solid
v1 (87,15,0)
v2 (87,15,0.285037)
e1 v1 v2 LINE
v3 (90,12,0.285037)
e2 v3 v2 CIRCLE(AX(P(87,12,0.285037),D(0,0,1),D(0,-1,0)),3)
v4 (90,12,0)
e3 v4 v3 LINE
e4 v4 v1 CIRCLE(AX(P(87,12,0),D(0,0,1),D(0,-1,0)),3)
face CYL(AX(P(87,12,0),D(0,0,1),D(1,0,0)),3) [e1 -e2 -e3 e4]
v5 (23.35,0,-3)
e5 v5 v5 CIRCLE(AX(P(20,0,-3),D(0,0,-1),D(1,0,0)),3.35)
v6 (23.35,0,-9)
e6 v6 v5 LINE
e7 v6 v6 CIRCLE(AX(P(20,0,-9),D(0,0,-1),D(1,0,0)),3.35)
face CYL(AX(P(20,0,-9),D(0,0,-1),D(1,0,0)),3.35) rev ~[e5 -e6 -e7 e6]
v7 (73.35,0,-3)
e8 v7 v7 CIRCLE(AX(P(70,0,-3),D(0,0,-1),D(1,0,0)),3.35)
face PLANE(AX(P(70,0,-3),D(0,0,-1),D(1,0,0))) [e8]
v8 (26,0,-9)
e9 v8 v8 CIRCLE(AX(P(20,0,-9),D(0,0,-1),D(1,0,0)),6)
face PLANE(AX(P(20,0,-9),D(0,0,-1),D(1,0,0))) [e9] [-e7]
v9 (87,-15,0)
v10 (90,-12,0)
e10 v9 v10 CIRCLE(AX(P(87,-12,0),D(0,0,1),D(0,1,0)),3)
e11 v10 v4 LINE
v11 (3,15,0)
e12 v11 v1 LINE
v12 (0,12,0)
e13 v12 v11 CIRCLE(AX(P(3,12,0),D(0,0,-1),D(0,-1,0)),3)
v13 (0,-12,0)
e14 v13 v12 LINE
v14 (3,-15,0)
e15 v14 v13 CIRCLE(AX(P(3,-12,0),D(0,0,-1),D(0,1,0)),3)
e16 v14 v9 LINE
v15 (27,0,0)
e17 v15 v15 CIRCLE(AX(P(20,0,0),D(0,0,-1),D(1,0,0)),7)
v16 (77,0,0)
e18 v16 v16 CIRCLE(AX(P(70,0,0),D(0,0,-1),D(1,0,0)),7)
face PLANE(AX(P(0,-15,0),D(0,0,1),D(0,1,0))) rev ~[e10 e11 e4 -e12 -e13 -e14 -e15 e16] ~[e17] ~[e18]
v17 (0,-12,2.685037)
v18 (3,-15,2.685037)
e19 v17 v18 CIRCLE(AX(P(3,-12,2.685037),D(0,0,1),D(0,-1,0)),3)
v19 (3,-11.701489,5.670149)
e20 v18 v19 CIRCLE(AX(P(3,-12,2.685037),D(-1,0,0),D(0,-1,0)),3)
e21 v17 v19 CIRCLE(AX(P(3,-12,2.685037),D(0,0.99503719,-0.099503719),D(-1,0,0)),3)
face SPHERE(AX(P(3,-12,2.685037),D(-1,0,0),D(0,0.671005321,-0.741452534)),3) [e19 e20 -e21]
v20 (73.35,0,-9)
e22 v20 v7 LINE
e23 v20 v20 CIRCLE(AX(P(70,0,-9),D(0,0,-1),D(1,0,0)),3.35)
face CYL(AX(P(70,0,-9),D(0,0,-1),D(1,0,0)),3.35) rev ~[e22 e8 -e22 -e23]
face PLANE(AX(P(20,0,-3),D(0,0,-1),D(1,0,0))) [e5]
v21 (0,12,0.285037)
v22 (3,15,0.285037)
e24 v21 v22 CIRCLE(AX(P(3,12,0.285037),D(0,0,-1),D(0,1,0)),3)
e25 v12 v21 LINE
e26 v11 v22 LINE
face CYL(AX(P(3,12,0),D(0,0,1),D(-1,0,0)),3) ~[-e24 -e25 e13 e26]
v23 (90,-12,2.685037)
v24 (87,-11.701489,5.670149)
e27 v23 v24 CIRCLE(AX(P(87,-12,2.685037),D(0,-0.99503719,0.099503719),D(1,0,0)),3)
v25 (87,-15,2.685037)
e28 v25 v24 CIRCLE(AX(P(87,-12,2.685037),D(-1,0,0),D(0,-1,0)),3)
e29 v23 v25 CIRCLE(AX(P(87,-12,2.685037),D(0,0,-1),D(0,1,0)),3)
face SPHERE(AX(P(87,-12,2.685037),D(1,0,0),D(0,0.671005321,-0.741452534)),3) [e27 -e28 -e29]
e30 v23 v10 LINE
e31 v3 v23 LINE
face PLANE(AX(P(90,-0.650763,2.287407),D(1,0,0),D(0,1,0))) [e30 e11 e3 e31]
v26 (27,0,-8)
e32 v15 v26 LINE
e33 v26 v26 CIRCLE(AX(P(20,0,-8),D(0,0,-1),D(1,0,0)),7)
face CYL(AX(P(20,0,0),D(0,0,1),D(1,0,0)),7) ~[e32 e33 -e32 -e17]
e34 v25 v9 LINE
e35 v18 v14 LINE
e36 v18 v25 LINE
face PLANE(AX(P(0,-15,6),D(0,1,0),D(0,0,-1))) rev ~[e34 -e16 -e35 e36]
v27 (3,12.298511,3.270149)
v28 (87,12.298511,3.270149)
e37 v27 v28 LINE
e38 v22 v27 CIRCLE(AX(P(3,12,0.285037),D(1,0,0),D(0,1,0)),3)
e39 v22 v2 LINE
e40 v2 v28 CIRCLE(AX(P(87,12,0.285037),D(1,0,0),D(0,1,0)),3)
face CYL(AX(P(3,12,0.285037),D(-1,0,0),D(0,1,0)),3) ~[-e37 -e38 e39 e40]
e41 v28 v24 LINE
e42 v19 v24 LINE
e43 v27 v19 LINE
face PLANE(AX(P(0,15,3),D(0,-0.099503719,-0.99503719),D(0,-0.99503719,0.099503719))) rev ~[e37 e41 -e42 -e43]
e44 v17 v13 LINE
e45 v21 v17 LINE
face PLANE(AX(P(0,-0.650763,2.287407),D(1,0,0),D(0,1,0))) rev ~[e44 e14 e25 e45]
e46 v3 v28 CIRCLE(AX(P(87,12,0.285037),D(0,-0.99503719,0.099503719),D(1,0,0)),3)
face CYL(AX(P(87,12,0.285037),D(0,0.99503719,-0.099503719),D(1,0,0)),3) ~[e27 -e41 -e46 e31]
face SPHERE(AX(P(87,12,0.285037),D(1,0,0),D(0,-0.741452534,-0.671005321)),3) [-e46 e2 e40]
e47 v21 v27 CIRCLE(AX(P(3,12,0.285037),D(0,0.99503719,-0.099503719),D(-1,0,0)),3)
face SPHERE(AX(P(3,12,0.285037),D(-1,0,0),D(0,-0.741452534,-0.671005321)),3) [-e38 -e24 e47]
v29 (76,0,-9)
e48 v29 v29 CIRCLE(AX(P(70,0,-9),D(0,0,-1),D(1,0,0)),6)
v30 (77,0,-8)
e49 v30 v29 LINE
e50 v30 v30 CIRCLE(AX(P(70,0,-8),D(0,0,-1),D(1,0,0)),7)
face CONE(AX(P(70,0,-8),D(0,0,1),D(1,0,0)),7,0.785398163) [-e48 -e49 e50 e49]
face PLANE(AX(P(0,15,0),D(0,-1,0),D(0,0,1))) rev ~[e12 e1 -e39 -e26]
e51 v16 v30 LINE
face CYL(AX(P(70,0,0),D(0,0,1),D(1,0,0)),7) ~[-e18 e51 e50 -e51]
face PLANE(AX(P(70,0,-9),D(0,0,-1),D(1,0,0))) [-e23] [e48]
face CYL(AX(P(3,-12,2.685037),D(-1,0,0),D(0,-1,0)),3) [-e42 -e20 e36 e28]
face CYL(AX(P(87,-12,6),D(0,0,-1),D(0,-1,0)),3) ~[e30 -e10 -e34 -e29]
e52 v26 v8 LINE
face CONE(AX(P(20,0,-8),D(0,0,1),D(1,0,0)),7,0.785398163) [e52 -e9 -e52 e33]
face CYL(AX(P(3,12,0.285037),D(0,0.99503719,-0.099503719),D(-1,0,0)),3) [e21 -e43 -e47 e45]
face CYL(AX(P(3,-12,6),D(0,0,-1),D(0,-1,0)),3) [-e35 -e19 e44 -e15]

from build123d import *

# Parameters (mm, degrees)
F1_DEPTH     = 90
F3_R         = 7
F4_DEPTH     = 9
F5_R         = 3.35
F6_DEPTH     = 6
F7_SIZE      = 1
F8_R         = 3
F9_T1_DEPTH  = 84
F9_T3_DEPTH  = 24.1197014907
F9_T8_DEPTH  = 3
F9_T14_DEPTH = 3
F9_T20_DEPTH = 3
F9_T26_DEPTH = 3


# Not quite as in the source:
# - a fillet or chamfer that OpenCascade refuses, or shapes differently, is made with other operations: its cross-section is extruded or revolved along the edge and cut away or added


with BuildPart() as f1:
    # F0 (on Right) → F1 (new body)
    with BuildSketch(Plane.YZ):
        Polygon((-15, 6), (-15, 0), (15, 0), (15, 3), align=None)
    extrude(amount=F1_DEPTH)

    # F3 (on face) → F4 (join)
    with BuildSketch(Plane(origin=(0, 0, 0), x_dir=(1, 0, 0), z_dir=(0, 0, -1))):
        with Locations((70, 0)):
            Circle(F3_R)
        with Locations((20, 0)):
            Circle(F3_R)
    extrude(amount=F4_DEPTH)

    # F5 (on face) → F6 (cut)
    with BuildSketch(Plane(origin=(0, 0, -9), x_dir=(1, 0, 0), z_dir=(0, 0, -1))):
        with Locations((70, 0)):
            Circle(F5_R)
        with Locations((20, 0)):
            Circle(F5_R)
    extrude(amount=-F6_DEPTH, mode=Mode.SUBTRACT)

    # F7
    f7_edges = [f1.edges().sort_by_distance(p)[0] for p in [
        (63, 0, -9),
        (13, 0, -9),
    ]]
    chamfer(f7_edges, length=F7_SIZE)

    # F8
    f8_edges = [f1.edges().sort_by_distance(p)[0] for p in [
        (90, 15, 1.5),
        (0, 15, 1.5),
        (0, -15, 3),
        (90, -15, 3),
    ]]
    fillet(f8_edges, radius=F8_R)

    # F9: fillet of radius 3 on 4 edges, made by hand

    # F9_s2 → F9_t1 (cut)
    with BuildSketch(Plane.YZ.offset(3)):
        with BuildLine():
            ThreePointArc((15, 0.2850373137), (14.2243576007, 2.2980532759), (12.2985111571, 3.2701488843))
            Line((12.2985111571, 3.2701488843), (15, 3))
            Line((15, 3), (15, 0.2850373137))
        make_face()
        with BuildLine():
            ThreePointArc((-15, 2.6850373137), (-14.0130159623, 4.9093949143), (-11.7014888429, 5.6701488843))
            Line((-11.7014888429, 5.6701488843), (-15, 6))
            Line((-15, 6), (-15, 2.6850373137))
        make_face()
    extrude(amount=F9_T1_DEPTH, mode=Mode.SUBTRACT)

    # F9_s4 → F9_t3 (cut)
    with BuildSketch(Plane(origin=(0, 11.8529666026, -1.1852966603), x_dir=(1, 0, 0), z_dir=(0, -0.9950371902, 0.099503719))):
        with BuildLine():
            ThreePointArc((0, 1.4776673559), (0.8786796564, 3.5989876995), (3, 4.4776673559))
            Line((3, 4.4776673559), (0, 4.4776673559))
            Line((0, 4.4776673559), (0, 1.4776673559))
        make_face()
        with BuildLine():
            ThreePointArc((90, 1.4776673559), (89.1213203436, 3.5989876995), (87, 4.4776673559))
            Line((87, 4.4776673559), (90, 4.4776673559))
            Line((90, 4.4776673559), (90, 1.4776673559))
        make_face()
    extrude(amount=F9_T3_DEPTH, mode=Mode.SUBTRACT)


with BuildPart() as f9_tool6:
    # F9_s7 → F9_t8 (new body)
    with BuildSketch(Plane.YZ.offset(87)):
        Polygon((12, 0.2850373137), (15, 0.2850373137), (15, 3), (12.2985111571, 3.2701488843), align=None)
    extrude(amount=F9_T8_DEPTH)

    # F9_s9 → F9_t10 (revolve, cut)
    with BuildSketch(Plane(origin=(87, 12, 0.2850373137), x_dir=(0, -0.7414525336, -0.6710053208), z_dir=(0, -0.6710053208, 0.7414525336))):
        with BuildLine():
            ThreePointArc((0, -3), (3, 0), (0, 3))
            Line((0, 3), (0, -3))
        make_face()
    revolve(axis=Axis((87, 12, 0.2850373137), (1, 0, 0)), mode=Mode.SUBTRACT)


with BuildPart() as f1_1:
    add(f1.part)

    # F9_t5: cut F9_tool6
    add(f9_tool6.part, mode=Mode.SUBTRACT)


with BuildPart() as f9_tool12:
    # F9_s13 → F9_t14 (new body)
    with BuildSketch(Plane.YZ.offset(87)):
        Polygon((-12, 2.6850373137), (-15, 2.6850373137), (-15, 6), (-11.7014888429, 5.6701488843), align=None)
    extrude(amount=F9_T14_DEPTH)

    # F9_s15 → F9_t16 (revolve, cut)
    with BuildSketch(Plane(origin=(87, -12, 2.6850373137), x_dir=(0, 0.6710053208, -0.7414525336), z_dir=(0, -0.7414525336, -0.6710053208))):
        with BuildLine():
            ThreePointArc((0, -3), (3, 0), (0, 3))
            Line((0, 3), (0, -3))
        make_face()
    revolve(axis=Axis((87, -12, 2.6850373137), (1, 0, 0)), mode=Mode.SUBTRACT)


with BuildPart() as f1_2:
    add(f1_1.part)

    # F9_t11: cut F9_tool12
    add(f9_tool12.part, mode=Mode.SUBTRACT)


with BuildPart() as f9_tool18:
    # F9_s19 → F9_t20 (new body)
    with BuildSketch(Plane.YZ.offset(3)):
        Polygon((12, 0.2850373137), (15, 0.2850373137), (15, 3), (12.2985111571, 3.2701488843), align=None)
    extrude(amount=-F9_T20_DEPTH)

    # F9_s21 → F9_t22 (revolve, cut)
    with BuildSketch(Plane(origin=(3, 12, 0.2850373137), x_dir=(0, -0.7414525336, -0.6710053208), z_dir=(0, 0.6710053208, -0.7414525336))):
        with BuildLine():
            ThreePointArc((0, -3), (3, 0), (0, 3))
            Line((0, 3), (0, -3))
        make_face()
    revolve(axis=Axis((3, 12, 0.2850373137), (-1, 0, 0)), mode=Mode.SUBTRACT)


with BuildPart() as f1_3:
    add(f1_2.part)

    # F9_t17: cut F9_tool18
    add(f9_tool18.part, mode=Mode.SUBTRACT)


with BuildPart() as f9_tool24:
    # F9_s25 → F9_t26 (new body)
    with BuildSketch(Plane.YZ.offset(3)):
        Polygon((-12, 2.6850373137), (-15, 2.6850373137), (-15, 6), (-11.7014888429, 5.6701488843), align=None)
    extrude(amount=-F9_T26_DEPTH)

    # F9_s27 → F9_t28 (revolve, cut)
    with BuildSketch(Plane(origin=(3, -12, 2.6850373137), x_dir=(0, 0.6710053208, -0.7414525336), z_dir=(0, 0.7414525336, 0.6710053208))):
        with BuildLine():
            ThreePointArc((0, -3), (3, 0), (0, 3))
            Line((0, 3), (0, -3))
        make_face()
    revolve(axis=Axis((3, -12, 2.6850373137), (-1, 0, 0)), mode=Mode.SUBTRACT)


with BuildPart() as f1_4:
    add(f1_3.part)

    # F9_t23: cut F9_tool24
    add(f9_tool24.part, mode=Mode.SUBTRACT)


solid = f1_4.part
